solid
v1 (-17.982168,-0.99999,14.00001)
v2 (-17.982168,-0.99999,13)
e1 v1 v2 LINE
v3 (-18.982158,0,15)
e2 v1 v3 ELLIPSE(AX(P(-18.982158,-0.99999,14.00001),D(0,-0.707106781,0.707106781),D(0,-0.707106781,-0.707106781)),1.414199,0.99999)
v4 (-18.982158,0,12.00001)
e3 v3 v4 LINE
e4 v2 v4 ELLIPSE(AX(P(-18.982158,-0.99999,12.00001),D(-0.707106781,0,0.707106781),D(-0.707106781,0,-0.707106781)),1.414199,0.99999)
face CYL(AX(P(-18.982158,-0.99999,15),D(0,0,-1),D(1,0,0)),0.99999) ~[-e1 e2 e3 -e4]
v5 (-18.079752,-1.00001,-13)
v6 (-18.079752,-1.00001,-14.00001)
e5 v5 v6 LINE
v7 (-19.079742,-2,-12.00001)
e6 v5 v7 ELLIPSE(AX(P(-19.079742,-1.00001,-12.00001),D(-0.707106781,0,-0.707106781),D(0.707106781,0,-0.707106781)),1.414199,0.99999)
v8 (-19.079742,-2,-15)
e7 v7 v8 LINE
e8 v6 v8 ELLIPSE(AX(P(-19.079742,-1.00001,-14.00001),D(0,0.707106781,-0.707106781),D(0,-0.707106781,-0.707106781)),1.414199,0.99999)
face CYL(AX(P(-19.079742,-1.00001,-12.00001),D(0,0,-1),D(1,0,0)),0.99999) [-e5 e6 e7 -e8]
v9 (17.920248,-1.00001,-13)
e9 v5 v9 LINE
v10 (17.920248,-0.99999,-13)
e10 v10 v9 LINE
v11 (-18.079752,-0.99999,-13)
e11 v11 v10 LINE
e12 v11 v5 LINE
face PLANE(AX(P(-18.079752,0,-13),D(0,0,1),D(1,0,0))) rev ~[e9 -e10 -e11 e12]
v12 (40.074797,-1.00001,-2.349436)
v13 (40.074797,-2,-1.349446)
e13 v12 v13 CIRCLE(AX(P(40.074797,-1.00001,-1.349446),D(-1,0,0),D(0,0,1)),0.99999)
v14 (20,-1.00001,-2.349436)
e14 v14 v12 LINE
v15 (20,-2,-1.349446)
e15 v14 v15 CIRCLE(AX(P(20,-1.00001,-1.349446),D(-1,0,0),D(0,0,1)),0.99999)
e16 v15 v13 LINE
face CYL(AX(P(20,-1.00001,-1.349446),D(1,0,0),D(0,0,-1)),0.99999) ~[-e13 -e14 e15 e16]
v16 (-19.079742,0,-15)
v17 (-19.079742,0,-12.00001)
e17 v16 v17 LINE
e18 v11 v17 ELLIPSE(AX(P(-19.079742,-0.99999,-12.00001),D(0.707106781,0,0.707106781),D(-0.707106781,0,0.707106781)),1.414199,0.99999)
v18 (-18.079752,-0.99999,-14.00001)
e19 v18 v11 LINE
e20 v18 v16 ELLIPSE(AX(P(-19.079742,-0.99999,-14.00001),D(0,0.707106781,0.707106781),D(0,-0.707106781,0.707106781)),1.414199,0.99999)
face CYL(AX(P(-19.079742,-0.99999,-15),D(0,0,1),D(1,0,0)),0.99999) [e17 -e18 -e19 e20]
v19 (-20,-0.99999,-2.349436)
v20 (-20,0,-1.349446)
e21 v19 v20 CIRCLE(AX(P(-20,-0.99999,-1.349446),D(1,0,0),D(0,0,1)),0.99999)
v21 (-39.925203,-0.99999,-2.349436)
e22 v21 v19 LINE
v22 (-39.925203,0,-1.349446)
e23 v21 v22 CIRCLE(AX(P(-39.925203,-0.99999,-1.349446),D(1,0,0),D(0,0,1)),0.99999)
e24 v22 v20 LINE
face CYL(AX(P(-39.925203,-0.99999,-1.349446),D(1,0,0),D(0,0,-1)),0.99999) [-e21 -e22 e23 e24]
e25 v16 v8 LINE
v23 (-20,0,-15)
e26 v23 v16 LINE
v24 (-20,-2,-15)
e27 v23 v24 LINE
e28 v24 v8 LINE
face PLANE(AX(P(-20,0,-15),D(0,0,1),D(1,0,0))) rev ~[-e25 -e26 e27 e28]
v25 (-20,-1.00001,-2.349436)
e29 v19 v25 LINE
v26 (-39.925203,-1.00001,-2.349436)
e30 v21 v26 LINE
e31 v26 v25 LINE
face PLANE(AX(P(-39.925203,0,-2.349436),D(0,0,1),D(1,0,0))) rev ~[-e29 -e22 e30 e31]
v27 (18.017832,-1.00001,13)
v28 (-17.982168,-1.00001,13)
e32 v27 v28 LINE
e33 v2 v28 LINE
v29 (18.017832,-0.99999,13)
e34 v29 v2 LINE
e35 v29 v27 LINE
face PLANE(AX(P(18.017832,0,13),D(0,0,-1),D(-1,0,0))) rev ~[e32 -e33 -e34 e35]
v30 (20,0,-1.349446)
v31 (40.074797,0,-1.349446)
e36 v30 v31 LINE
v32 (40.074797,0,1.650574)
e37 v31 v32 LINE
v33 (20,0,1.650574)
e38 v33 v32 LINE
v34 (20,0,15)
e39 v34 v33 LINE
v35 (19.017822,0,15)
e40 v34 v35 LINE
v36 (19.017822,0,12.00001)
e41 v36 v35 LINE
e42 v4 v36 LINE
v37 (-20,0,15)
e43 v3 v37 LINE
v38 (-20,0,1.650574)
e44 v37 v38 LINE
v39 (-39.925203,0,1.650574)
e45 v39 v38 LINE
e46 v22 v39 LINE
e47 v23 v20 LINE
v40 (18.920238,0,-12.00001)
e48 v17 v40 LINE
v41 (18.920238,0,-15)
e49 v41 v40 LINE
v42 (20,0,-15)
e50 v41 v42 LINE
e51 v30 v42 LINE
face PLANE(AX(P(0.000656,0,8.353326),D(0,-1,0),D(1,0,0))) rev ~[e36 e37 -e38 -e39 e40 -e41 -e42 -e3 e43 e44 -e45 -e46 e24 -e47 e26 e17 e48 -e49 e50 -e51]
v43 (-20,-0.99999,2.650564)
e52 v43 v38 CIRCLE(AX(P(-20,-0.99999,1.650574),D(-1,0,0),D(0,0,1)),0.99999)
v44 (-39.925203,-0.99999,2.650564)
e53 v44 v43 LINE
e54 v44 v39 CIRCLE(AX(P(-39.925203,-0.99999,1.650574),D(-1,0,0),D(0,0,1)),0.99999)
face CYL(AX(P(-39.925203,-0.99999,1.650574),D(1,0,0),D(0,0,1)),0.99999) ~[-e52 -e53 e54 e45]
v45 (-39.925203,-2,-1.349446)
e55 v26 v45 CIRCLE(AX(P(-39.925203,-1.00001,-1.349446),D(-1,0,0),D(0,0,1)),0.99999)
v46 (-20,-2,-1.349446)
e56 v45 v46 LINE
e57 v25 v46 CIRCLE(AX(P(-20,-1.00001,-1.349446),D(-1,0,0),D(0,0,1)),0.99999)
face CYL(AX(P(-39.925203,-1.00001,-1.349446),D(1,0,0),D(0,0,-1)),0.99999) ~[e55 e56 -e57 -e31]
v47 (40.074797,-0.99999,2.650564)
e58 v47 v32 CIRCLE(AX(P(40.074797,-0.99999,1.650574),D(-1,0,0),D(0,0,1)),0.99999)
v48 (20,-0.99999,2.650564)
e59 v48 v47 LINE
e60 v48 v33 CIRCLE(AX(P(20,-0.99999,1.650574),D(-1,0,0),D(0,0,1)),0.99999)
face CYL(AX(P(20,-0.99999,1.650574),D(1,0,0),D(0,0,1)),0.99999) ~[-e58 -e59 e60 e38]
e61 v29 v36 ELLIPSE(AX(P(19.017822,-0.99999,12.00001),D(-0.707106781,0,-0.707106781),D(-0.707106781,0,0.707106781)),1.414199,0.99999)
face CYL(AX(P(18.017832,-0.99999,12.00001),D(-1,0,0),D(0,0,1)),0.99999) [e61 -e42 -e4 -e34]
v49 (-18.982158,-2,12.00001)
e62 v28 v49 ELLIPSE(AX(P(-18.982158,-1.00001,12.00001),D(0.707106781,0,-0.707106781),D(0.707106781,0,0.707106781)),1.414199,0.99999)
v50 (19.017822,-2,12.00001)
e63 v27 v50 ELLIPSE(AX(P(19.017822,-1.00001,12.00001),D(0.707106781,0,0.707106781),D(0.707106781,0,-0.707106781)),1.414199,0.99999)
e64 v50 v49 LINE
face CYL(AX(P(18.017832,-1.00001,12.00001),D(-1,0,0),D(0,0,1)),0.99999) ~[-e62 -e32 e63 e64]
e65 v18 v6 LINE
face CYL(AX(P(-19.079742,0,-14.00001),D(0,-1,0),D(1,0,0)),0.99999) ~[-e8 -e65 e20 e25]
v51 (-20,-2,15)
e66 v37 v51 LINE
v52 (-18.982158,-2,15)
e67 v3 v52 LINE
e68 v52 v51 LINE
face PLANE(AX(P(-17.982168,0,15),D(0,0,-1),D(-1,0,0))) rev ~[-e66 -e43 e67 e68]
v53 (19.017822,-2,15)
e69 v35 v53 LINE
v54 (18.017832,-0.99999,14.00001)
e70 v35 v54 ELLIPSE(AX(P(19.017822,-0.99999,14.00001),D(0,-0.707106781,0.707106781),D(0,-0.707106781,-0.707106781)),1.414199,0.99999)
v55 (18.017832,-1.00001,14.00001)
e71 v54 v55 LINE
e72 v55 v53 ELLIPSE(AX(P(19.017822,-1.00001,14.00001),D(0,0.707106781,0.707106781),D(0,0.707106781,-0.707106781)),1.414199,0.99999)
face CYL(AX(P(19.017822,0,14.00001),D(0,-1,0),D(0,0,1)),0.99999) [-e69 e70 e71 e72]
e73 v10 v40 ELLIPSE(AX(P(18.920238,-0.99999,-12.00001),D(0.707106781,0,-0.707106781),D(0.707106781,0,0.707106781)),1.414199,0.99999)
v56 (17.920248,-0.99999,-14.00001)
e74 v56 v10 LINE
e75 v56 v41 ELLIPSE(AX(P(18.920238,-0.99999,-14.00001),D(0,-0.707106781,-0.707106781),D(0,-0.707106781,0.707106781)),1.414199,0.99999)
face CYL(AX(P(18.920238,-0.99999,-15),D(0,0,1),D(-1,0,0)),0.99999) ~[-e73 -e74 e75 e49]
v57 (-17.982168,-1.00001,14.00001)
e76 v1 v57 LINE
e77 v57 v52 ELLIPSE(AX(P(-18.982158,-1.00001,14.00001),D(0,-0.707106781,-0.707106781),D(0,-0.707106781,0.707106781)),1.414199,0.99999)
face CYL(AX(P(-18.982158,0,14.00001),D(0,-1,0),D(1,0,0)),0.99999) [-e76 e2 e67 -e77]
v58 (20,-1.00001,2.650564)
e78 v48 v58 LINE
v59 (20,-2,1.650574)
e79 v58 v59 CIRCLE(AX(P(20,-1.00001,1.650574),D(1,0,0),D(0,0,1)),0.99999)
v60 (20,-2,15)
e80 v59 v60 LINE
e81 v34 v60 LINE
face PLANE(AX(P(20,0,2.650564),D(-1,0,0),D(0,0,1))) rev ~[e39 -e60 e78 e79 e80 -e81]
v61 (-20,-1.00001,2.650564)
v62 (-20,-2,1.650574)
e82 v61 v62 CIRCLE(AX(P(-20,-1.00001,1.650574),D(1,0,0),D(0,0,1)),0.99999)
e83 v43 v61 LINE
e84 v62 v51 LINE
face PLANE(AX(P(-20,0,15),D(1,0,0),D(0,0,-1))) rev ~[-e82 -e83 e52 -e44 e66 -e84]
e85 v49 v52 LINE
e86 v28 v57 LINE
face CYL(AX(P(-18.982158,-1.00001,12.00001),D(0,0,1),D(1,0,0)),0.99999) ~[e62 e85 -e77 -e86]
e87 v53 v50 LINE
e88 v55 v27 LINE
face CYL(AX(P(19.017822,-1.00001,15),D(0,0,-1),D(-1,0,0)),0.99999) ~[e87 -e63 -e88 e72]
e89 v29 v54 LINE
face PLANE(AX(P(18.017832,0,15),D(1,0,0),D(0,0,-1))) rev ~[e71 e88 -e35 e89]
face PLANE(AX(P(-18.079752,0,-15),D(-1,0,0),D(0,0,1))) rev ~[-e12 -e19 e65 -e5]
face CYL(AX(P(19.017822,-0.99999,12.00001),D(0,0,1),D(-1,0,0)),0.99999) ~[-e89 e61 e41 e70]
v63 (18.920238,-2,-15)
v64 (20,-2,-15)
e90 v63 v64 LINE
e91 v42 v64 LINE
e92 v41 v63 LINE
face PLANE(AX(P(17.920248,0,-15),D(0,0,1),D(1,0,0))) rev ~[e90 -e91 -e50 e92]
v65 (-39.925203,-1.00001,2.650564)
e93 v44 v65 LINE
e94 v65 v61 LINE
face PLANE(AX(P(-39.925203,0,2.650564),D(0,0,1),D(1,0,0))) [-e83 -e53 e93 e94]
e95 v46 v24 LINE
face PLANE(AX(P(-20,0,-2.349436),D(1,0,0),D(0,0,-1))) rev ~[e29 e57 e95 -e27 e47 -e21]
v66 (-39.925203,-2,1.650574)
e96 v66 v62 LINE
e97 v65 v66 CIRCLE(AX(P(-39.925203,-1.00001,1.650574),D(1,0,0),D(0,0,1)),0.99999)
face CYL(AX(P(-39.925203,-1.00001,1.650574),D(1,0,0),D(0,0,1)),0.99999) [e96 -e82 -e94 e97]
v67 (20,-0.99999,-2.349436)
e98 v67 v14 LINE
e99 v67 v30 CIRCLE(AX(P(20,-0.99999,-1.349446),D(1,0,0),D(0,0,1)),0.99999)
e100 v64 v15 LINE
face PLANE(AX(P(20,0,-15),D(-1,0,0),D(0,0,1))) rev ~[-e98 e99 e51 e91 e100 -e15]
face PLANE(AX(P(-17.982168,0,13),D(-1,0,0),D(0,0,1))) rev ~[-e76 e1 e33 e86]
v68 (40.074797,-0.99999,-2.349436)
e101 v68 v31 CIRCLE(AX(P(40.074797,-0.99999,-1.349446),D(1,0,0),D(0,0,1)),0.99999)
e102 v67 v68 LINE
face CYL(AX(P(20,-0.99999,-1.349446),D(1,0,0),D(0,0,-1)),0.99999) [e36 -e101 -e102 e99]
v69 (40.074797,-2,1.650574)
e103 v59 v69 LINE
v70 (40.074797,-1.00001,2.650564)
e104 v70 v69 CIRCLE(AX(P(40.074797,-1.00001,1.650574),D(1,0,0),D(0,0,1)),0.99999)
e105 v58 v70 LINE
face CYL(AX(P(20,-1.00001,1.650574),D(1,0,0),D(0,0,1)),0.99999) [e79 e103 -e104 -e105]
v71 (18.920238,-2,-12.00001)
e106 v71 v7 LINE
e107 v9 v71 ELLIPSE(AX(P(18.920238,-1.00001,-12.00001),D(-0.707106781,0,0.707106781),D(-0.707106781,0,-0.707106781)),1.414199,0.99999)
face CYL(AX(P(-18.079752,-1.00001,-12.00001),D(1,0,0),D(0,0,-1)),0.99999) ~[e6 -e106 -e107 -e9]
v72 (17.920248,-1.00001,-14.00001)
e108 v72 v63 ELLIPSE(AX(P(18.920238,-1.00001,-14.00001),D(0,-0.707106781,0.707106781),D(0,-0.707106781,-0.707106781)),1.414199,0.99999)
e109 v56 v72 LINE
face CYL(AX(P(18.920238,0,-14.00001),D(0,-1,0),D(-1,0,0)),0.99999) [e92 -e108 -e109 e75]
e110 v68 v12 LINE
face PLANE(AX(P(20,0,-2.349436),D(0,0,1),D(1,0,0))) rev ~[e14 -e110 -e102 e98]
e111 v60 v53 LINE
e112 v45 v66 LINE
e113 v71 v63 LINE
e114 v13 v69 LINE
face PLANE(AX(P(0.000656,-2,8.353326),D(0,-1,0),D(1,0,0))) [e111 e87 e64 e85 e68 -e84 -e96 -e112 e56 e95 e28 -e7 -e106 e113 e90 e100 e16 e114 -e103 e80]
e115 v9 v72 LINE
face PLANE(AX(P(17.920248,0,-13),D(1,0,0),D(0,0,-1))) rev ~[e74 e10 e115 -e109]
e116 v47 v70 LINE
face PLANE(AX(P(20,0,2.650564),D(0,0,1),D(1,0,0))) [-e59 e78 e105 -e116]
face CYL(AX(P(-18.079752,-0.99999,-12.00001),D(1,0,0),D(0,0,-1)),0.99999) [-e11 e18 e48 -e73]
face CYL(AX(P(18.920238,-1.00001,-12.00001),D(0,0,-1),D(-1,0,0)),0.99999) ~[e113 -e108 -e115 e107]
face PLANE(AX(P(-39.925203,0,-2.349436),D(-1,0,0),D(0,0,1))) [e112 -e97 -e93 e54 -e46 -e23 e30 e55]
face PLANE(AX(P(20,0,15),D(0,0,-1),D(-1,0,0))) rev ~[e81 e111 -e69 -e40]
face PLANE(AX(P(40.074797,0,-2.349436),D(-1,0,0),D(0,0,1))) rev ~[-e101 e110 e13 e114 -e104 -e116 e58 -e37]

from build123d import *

# Parameters (mm, degrees)
F0_W     = 40
F0_H     = 5
F0_W_2   = 20.0747972727
F0_W_3   = 19.9252027273
F1_DEPTH = 2
F2_R     = 0.99999
F3_R     = 0.99999
F4_R     = 0.99999


# Not quite as in the source:
# - a fillet or chamfer is up to 0.001 mm smaller than in the source, because OpenCascade refuses the exact size


with BuildPart() as f1:
    # F0 (on Front) → F1 (new body)
    with BuildSketch(Plane.XZ):
        Polygon((-17.9821681231, 15), (-20, 15), (-20, 2.6505640079), (20, 2.6505640079), (20, 15), (18.0178318769, 15), (18.0178318769, 13), (-17.9821681231, 13), align=None)
        with Locations((0, 0.1505640079)):
            Rectangle(F0_W, F0_H)
        with Locations((30.0373986363, 0.1505640079)):
            Rectangle(F0_W_2, F0_H)
        with Locations((-29.9626013637, 0.1505640079)):
            Rectangle(F0_W_3, F0_H)
        Polygon((20, -2.3494359921), (-20, -2.3494359921), (-20, -15), (-18.0797521025, -15), (-18.0797521025, -13), (17.9202478975, -13), (17.9202478975, -15), (20, -15), align=None)
    extrude(amount=F1_DEPTH)

    # F2 (radius 1 in the source; OpenCascade refuses exactly that, so slightly less here)
    f2_edges = [f1.edges().sort_by_distance(p)[0] for p in [
        (30.037399, -2, -2.349436),
        (30.037399, 0, -2.349436),
        (30.037399, -2, 2.650564),
        (-29.962601, 0, 2.650564),
        (-29.962601, -2, 2.650564),
        (-29.962601, 0, -2.349436),
        (30.037399, 0, 2.650564),
        (-29.962601, -2, -2.349436),
    ]]
    fillet(f2_edges, radius=F2_R)

    # F3 (radius 1 in the source; OpenCascade refuses exactly that, so slightly less here)
    f3_edges = [f1.edges().sort_by_distance(p)[0] for p in [
        (-0.079752, -2, -13),
        (-0.079752, 0, -13),
        (0.017832, 0, 13),
        (0.017832, -2, 13),
    ]]
    fillet(f3_edges, radius=F3_R)

    # F4 (radius 1 in the source; OpenCascade refuses exactly that, so slightly less here)
    f4_edges = [f1.edges().sort_by_distance(p)[0] for p in [
        (18.017832, -2, 14),
        (18.017832, -1, 15),
        (18.017832, 0, 14),
        (-17.982168, -2, 14),
        (-17.982168, -1, 15),
        (-18.079752, -2, -14),
        (17.920248, -2, -14),
        (-17.982168, 0, 14),
        (-18.079752, 0, -14),
        (-18.079752, -1, -15),
        (17.920248, 0, -14),
        (17.920248, -1, -15),
    ]]
    fillet(f4_edges, radius=F4_R)


solid = f1.part
